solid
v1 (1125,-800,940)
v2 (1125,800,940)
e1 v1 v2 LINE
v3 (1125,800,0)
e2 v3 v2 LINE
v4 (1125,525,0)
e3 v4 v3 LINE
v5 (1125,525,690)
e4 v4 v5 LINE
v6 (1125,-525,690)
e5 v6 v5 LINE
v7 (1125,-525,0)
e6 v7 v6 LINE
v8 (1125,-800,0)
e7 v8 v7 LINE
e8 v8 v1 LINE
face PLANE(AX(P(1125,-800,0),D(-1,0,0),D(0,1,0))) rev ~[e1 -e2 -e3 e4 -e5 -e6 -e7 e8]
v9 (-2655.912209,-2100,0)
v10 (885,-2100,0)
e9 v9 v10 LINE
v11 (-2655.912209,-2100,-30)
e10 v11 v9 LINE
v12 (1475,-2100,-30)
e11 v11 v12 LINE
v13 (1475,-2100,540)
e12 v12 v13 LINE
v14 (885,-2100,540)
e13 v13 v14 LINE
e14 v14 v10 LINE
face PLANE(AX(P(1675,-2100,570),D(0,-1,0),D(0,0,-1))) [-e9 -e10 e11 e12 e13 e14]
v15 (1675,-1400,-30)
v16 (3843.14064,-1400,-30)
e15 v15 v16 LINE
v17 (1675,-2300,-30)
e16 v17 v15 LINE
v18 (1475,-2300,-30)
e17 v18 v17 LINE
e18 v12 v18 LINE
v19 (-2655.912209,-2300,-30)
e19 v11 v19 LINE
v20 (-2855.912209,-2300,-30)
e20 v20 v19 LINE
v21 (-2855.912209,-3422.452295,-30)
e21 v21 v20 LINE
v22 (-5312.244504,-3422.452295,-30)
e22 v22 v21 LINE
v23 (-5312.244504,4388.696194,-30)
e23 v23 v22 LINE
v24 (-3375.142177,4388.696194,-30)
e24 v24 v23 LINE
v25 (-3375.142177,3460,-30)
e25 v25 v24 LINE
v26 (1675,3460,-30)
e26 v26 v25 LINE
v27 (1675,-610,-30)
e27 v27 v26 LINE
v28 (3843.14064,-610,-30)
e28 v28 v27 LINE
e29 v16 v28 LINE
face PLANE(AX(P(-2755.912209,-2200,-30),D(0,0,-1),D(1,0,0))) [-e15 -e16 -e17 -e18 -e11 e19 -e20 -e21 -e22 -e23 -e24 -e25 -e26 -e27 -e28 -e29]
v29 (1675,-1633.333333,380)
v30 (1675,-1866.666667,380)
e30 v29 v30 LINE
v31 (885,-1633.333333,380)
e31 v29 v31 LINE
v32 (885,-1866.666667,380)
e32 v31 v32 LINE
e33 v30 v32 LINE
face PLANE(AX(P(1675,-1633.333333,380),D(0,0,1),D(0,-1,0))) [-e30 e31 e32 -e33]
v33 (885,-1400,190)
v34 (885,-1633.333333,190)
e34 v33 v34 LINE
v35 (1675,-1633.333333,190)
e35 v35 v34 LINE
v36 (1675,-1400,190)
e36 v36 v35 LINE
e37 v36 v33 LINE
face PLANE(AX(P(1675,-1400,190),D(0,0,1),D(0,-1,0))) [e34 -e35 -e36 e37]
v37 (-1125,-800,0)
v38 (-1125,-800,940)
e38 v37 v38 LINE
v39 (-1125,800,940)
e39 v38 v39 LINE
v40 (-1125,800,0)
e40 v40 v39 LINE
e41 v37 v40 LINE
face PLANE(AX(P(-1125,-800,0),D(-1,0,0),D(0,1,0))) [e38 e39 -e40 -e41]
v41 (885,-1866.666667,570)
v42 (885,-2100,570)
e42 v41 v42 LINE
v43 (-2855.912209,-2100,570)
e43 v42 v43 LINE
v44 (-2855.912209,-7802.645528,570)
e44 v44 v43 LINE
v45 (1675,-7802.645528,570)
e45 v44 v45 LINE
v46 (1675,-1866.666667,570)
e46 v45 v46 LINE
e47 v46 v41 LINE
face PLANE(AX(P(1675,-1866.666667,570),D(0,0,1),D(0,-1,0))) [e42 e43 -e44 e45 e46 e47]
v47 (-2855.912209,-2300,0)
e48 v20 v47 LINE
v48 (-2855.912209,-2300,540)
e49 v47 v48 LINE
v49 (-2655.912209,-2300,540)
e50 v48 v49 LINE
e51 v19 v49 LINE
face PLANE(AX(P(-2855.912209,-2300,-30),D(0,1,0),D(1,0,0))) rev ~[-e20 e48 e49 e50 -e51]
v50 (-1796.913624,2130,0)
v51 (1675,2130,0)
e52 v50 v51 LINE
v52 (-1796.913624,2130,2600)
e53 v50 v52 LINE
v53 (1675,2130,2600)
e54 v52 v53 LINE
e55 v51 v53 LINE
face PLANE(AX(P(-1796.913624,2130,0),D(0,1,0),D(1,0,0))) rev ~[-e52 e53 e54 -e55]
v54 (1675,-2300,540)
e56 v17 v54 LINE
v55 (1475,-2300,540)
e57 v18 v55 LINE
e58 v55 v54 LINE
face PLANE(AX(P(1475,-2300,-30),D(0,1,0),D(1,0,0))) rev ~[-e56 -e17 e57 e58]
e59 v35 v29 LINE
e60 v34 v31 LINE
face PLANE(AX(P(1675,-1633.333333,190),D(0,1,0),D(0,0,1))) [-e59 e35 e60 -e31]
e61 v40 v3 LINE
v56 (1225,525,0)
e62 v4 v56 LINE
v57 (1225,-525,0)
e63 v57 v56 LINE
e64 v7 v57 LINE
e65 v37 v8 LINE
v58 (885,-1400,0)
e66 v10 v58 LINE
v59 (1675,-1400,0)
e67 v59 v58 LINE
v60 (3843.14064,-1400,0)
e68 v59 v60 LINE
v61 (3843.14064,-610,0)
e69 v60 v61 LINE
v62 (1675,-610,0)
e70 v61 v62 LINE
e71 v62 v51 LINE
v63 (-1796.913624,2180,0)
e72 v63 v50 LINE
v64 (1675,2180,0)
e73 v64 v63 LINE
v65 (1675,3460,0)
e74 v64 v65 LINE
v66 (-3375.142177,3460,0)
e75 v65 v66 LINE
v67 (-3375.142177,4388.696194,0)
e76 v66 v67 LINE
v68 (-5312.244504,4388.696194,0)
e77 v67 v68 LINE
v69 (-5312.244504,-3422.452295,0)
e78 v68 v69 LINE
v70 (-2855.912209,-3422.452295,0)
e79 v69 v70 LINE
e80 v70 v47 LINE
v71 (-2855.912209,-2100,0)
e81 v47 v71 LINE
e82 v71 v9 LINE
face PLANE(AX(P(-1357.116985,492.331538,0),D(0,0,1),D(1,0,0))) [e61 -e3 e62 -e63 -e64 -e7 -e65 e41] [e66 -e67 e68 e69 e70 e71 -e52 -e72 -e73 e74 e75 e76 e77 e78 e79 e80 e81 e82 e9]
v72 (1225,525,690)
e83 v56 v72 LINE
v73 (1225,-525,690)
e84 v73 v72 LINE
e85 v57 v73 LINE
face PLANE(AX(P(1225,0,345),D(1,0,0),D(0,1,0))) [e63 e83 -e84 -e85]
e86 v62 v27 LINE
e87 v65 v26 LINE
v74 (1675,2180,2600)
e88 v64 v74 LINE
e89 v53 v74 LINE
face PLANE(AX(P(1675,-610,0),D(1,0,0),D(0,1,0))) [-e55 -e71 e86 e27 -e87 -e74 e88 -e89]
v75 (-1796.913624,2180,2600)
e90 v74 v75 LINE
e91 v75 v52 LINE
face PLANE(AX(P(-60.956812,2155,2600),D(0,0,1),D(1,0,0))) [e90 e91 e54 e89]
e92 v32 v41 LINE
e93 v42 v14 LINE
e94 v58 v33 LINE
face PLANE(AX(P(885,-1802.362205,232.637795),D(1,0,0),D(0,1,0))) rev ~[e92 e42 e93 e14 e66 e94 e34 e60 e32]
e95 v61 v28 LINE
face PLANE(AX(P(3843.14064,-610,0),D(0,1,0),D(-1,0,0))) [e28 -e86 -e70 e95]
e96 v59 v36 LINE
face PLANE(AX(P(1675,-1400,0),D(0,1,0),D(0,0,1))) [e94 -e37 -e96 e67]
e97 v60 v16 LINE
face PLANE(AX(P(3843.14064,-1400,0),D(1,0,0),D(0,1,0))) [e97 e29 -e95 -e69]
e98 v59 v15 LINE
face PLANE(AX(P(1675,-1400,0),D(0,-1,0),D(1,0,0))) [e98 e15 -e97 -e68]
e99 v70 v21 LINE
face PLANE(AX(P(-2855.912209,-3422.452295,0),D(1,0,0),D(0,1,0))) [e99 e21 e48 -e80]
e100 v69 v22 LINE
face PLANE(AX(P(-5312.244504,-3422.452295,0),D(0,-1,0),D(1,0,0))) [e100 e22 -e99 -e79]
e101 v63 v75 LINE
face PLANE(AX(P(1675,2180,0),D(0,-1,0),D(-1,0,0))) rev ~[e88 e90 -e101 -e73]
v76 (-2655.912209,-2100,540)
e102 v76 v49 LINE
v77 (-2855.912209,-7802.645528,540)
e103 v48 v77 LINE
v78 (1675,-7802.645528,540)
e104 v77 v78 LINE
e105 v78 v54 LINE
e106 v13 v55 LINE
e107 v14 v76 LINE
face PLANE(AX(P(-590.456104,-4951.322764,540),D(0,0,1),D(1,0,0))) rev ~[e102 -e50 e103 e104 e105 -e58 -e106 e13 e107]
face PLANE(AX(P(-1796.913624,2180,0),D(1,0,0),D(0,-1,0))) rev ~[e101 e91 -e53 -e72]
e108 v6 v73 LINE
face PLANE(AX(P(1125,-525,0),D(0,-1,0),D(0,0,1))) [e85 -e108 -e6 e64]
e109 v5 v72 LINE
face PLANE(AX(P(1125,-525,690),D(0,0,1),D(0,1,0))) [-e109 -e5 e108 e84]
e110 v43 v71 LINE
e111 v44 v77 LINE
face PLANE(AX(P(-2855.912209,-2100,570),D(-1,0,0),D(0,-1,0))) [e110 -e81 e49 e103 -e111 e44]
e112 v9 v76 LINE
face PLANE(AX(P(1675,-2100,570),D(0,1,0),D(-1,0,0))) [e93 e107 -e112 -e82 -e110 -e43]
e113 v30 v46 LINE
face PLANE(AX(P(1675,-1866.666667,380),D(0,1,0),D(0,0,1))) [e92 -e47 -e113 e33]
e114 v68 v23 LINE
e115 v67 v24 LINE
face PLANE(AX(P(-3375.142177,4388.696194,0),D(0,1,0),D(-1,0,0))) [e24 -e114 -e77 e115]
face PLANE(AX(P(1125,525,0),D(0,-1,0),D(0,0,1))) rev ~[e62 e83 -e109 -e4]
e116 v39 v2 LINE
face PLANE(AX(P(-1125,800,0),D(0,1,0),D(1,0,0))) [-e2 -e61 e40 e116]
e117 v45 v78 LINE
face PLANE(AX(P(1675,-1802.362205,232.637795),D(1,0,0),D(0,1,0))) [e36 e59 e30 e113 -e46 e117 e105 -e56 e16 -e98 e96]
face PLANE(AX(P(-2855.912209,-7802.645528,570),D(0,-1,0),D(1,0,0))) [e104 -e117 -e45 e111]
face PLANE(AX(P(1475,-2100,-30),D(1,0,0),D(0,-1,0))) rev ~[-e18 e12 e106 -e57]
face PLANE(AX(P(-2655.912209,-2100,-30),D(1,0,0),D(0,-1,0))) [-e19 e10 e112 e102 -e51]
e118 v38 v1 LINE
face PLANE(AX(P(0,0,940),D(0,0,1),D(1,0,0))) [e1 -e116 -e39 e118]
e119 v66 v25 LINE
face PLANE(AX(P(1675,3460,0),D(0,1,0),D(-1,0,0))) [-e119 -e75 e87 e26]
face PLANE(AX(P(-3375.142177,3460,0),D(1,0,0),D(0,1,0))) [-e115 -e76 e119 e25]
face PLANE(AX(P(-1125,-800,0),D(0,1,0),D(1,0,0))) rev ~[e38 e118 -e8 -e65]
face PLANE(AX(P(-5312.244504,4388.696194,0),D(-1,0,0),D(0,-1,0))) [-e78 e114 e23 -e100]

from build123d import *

# Parameters (mm, degrees)
F0_W      = 2250
F0_H      = 1600
F1_DEPTH  = 940
F0_W_2    = 500
F0_H_2    = 1800
F0_W_3    = 790
F0_H_3    = 700
F0_W_4    = 1800
F0_H_4    = 500
F2_DEPTH  = 30
F3_W      = 1050
F3_H      = 690
F4_DEPTH  = 100
F5_DEPTH  = 2600
F6_W      = 200
F6_H      = 200
F7_DEPTH  = 600
F9_DEPTH  = 30
F11_DEPTH = 790


# Not quite as in the source:
# - a feature names something its author has since deleted; it is built from what else it names


with BuildPart() as f1:
    # F0 (on Top) → F1 (new body)
    with BuildSketch(Plane.XY):
        Rectangle(F0_W, F0_H)
    extrude(amount=F1_DEPTH)

    # F0 (on Top) → F2 (join)
    with BuildSketch(Plane.XY):
        Polygon((1675, 2130), (3.0863761902, 2130), (-1796.9136238098, 2130), (-1796.9136238098, 2180), (1675, 2180), (1675, 3460), (-3375.1421768536, 3460), (-3375.1421768536, 4388.6961936951), (-5312.2445035196, 4388.6961936951), (-5312.2445035196, -3422.4522947772), (-2855.9122085571, -3422.4522947772), (-2855.9122085571, -2100), (-2855.9122085571, -300), (-2355.9122085571, -300), (-2355.9122085571, -2100), (-1255.9122085571, -2100), (-1255.9122085571, -1600), (544.0877914429, -1600), (544.0877914429, -2100), (885, -2100), (885, -1400), (1675, -1400), (1817.5126314163, -1400), (2516.7963504791, -1400), (3843.1406402588, -1400), (3843.1406402588, -610), (3053.1406402588, -610), (1675, -610), align=None)
        Rectangle(F0_W, F0_H, mode=Mode.SUBTRACT)
        with Locations((-2605.9122085571, -1200)):
            Rectangle(F0_W_2, F0_H_2)
        with Locations((1280, -1750)):
            Rectangle(F0_W_3, F0_H_3)
        Polygon((-1796.9136238098, 2130), (3.0863761902, 2130), (1675, 2130), (1675, 2180), (-1796.9136238098, 2180), align=None)
        Rectangle(F0_W, F0_H)
        with Locations((-355.9122085571, -1850)):
            Rectangle(F0_W_4, F0_H_4)
    extrude(amount=-F2_DEPTH)

    # F3 (on face) → F4 (join)
    with BuildSketch(Plane.YZ.offset(1125)):
        with Locations((0, 345)):
            Rectangle(F3_W, F3_H)
    extrude(amount=F4_DEPTH)

    # F0 (on Top) → F5 (join)
    with BuildSketch(Plane.XY):
        Polygon((-1796.9136238098, 2130), (3.0863761902, 2130), (1675, 2130), (1675, 2180), (-1796.9136238098, 2180), align=None)
    extrude(amount=F5_DEPTH)

    # F6 (on face) → F7 (join)
    with BuildSketch(Plane(origin=(0, 0, -30), x_dir=(1, 0, 0), z_dir=(0, 0, -1))):
        with Locations((-2755.9122085571, 2200)):
            Rectangle(F6_W, F6_H)
        with Locations((1575, 2200)):
            Rectangle(F6_W, F6_H)
    extrude(amount=-F7_DEPTH)

    # F8 (on face) → F9 (join)
    with BuildSketch(Plane.XY.offset(570)):
        Polygon((-2855.9122085571, -7802.6455282672), (1675, -7802.6455282672), (1675, -2100), (885, -2100), (544.0877914429, -2100), (-2855.9122085571, -2100), (-2855.9122085571, -3422.4522947772), align=None)
    extrude(amount=-F9_DEPTH)

    # F10 (on face) → F11 (join, through all)
    with BuildSketch(Plane.YZ.offset(1675)):
        Polygon((-1866.6666666667, 570), (-2100, 570), (-2100, 0), (-1400, 0), (-1400, 190), (-1633.3333333333, 190), (-1633.3333333333, 380), (-1866.6666666667, 380), align=None)
    extrude(amount=-F11_DEPTH)


solid = f1.part
